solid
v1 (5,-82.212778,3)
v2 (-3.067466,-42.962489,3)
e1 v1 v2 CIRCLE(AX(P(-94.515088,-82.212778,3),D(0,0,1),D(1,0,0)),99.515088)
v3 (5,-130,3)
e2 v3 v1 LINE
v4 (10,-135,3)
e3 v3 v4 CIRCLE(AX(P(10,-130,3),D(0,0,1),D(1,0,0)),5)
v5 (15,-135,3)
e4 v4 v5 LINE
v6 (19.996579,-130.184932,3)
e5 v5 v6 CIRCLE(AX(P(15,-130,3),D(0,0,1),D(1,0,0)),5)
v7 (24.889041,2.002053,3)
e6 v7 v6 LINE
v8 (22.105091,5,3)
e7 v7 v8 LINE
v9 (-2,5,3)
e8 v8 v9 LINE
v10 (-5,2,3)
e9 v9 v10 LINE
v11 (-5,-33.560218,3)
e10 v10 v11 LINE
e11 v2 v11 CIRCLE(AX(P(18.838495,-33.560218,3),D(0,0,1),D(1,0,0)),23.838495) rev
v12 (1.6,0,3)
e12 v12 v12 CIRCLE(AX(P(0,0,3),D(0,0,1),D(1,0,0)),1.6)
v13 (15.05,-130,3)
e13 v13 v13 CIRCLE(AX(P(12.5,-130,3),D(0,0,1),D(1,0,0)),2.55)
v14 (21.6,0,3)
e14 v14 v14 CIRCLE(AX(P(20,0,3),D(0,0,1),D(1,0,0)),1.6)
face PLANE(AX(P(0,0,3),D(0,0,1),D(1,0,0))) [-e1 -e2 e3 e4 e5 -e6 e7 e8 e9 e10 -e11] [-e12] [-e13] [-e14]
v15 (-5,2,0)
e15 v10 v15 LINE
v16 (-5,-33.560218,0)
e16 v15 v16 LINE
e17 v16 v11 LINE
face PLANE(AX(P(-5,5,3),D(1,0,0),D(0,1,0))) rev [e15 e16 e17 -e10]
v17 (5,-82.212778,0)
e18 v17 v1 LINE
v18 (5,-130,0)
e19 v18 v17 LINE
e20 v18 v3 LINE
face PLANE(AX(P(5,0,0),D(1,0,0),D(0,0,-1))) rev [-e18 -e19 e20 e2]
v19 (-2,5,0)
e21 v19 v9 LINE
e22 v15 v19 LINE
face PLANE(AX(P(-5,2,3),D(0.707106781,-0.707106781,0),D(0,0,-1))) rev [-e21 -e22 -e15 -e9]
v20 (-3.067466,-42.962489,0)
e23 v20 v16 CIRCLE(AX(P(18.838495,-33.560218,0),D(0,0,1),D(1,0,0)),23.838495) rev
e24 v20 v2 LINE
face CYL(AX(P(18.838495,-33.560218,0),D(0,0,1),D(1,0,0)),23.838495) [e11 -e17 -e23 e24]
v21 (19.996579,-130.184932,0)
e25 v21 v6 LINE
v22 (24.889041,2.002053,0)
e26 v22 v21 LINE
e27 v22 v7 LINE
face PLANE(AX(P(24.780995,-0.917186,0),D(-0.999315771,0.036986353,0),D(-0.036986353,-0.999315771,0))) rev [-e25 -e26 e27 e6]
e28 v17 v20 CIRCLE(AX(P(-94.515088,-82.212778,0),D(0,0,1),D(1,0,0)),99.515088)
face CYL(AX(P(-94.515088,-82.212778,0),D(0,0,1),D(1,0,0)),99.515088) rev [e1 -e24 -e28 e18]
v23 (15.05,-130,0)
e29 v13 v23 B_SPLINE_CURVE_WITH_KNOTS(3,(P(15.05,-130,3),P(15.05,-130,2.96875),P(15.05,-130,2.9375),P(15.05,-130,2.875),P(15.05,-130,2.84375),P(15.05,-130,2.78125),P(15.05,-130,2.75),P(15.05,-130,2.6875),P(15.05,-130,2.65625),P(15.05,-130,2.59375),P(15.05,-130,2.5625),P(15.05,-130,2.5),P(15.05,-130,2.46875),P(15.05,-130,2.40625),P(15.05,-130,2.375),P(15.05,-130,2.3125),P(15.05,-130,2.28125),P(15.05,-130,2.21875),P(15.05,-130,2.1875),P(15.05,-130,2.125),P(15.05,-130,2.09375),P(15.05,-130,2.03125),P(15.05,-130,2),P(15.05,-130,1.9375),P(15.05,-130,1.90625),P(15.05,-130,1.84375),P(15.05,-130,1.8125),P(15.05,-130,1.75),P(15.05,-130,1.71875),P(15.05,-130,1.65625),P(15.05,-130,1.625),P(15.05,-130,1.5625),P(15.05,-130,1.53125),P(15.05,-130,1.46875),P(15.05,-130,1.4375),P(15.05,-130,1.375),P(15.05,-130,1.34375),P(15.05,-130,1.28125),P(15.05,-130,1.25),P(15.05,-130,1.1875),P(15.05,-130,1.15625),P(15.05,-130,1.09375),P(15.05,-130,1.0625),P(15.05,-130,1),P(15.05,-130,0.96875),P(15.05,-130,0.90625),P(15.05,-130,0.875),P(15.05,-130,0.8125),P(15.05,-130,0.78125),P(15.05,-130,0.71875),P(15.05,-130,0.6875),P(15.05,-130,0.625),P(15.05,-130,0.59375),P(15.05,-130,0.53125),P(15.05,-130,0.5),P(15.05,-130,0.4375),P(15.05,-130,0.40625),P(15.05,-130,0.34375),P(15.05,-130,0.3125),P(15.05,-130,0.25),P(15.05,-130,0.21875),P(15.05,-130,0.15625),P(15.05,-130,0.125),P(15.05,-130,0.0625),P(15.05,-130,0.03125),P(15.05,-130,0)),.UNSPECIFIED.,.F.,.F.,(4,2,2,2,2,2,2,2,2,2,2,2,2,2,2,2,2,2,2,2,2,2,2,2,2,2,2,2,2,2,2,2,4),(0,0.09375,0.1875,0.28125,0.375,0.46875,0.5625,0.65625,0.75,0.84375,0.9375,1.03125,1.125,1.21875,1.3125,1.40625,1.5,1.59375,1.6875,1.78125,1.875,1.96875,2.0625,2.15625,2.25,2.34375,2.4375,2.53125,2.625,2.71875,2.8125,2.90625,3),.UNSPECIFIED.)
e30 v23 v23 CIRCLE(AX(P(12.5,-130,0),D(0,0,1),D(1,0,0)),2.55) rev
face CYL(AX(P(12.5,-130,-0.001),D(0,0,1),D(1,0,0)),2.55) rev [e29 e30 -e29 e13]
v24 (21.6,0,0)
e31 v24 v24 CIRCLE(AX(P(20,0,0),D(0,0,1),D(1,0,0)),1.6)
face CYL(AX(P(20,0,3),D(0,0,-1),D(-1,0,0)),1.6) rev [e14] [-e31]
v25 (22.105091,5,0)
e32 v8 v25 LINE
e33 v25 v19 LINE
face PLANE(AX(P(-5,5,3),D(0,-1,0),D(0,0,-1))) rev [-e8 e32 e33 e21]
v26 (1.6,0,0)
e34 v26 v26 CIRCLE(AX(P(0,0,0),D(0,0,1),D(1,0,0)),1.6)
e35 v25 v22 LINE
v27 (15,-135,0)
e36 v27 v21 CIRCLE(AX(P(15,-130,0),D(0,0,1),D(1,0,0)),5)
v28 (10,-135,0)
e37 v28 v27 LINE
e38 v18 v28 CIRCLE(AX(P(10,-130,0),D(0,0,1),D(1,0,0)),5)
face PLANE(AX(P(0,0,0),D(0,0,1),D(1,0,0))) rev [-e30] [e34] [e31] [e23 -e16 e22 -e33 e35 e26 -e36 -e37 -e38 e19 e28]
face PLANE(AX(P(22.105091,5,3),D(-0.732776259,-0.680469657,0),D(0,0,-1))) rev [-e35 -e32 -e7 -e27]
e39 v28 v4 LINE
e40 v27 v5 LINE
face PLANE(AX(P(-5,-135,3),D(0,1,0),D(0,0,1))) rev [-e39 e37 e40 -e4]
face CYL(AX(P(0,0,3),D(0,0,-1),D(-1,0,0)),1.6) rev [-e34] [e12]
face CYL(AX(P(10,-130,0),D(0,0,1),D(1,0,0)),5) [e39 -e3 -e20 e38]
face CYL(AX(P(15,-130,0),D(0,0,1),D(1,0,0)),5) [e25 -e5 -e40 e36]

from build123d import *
from OCP.BRepFilletAPI import BRepFilletAPI_MakeChamfer

# Parameters (mm, degrees)
SKETCH_1_W          = 30
SKETCH_1_H          = 140
SKETCH_1_R          = 1.6
EXTRUDE_1_DEPTH     = 3
CUT_EXTRUDE_3_REACH = 139.328
SKETCH_4_W          = 5
SKETCH_4_H          = 55
CHAMFER_1_SIZE      = 2.5
CUT_EXTRUDE_4_REACH = 139.328
SKETCH_5_R          = 2.55
EXTRUDE_5_DEPTH     = 3
EXTRUDE_2_DEPTH     = 3
FILLET_2_R          = 65
FILLET_3_R          = 115
FILLET_4_R          = 5
CUT_EXTRUDE_START   = -3
CUT_EXTRUDE_6_DEPTH = 3
CHAMFER_2_SIZE      = 3
CHAMFER_2_SIZE2     = 2.894908666


# Read off the part's stored shape, not the designer's step: 切除-拉伸6
with BuildPart() as part:
    # 草图1 → 凸台-拉伸1 (new body)
    with BuildSketch(Plane.XY):
        with Locations((10, -65)):
            Rectangle(SKETCH_1_W, SKETCH_1_H)
        Circle(SKETCH_1_R, mode=Mode.SUBTRACT)
        with Locations((20, 0)):
            Circle(SKETCH_1_R, mode=Mode.SUBTRACT)
    extrude(amount=EXTRUDE_1_DEPTH)

    # 草图4 → 切除-拉伸3 (cut, up to next)
    with BuildSketch(Plane.XY.offset(3), mode=Mode.PRIVATE) as cut_extrude_3_sk1:
        with Locations((-2.5, -107.5)):
            Rectangle(SKETCH_4_W, SKETCH_4_H)
    cut_extrude_3_tool1 = extrude(cut_extrude_3_sk1.sketch, amount=-CUT_EXTRUDE_3_REACH, mode=Mode.PRIVATE) & part.part
    add(cut_extrude_3_tool1.solids().sort_by_distance((-2.5, -107.5, 3))[0], mode=Mode.SUBTRACT)

    # 倒角1
    chamfer_1_edges = [part.edges().sort_by_distance(p)[0] for p in [
        (-5, -80, 1.5),
    ]]
    chamfer(chamfer_1_edges, length=CHAMFER_1_SIZE)

    # 草图5 → 切除-拉伸4 (cut, up to next)
    with BuildSketch(Plane.XY.offset(3), mode=Mode.PRIVATE) as cut_extrude_4_sk1:
        with Locations((12.5, -130)):
            Circle(SKETCH_5_R)
    cut_extrude_4_tool1 = extrude(cut_extrude_4_sk1.sketch, amount=-CUT_EXTRUDE_4_REACH, mode=Mode.PRIVATE) & part.part
    add(cut_extrude_4_tool1.solids().sort_by_distance((12.5, -130, 3))[0], mode=Mode.SUBTRACT)

    # 草图9 → 凸台-拉伸5 (add)
    with BuildSketch(Plane(origin=(0, 0, 0), x_dir=(-1, 0, 0), z_dir=(0, 0, -1))):
        Polygon((5, -77.5), (0, -107.5), (0, -80), (2.5, -80), align=None)
    extrude(amount=-EXTRUDE_5_DEPTH)

    # 草图11 → 拉伸-薄壁2 (add)
    with BuildSketch(Plane.XY.offset(3)):
        Polygon((19.5, -67.916286439), (19.5, -61.710608008), (19.5, -3.420169007), (16.5, -3.420169007), (16.5, -61.710608008), (16.5, -67.916286439), align=None)
    extrude(amount=-EXTRUDE_2_DEPTH)

    # 圆角2
    fillet_2_edges = [part.edges().sort_by_distance(p)[0] for p in [
        (-5, -77.5, 1.5),
    ]]
    fillet(fillet_2_edges, radius=FILLET_2_R)

    # 圆角3
    fillet_3_edges = [part.edges().sort_by_distance(p)[0] for p in [
        (0, -107.5, 1.5),
    ]]
    fillet(fillet_3_edges, radius=FILLET_3_R)

    # 圆角4
    fillet_4_edges = [part.edges().sort_by_distance(p)[0] for p in [
        (0, -135, 1.5),
    ]]
    fillet(fillet_4_edges, radius=FILLET_4_R)

    # 切除-拉伸6 outline → 切除-拉伸6 (cut)
    with BuildSketch(Plane.XY.offset(3).offset(CUT_EXTRUDE_START)):
        with BuildLine():
            ThreePointArc((19.996578854, -130.184931767), (18.469534635, -133.600323516), (15, -135))
            Line((15, -135), (25, -135))
            Line((25, -135), (25, 5))
            Line((25, 5), (19.996578854, -130.184931767))
        make_face()
        with BuildLine():
            ThreePointArc((10, -135), (6.464466094, -133.535533906), (5, -130))
            Line((5, -130), (5, -82.212778368))
            ThreePointArc((5, -82.212778368), (2.962270532, -62.17737686), (-3.067466378, -42.962488681))
            ThreePointArc((-3.067466378, -42.962488681), (-4.511868965, -38.359628786), (-5, -33.560217765))
            Line((-5, -33.560217765), (-5, -72.120435531))
            ThreePointArc((-5, -72.120435531), (-4.778523942, -77.481670081), (-4.115605049, -82.806369705))
            Line((-4.115605049, -82.806369705), (-1.564698759, -98.111807444))
            ThreePointArc((-1.564698759, -98.111807444), (-0.391842257, -107.532429856), (0, -117.017690984))
            Line((0, -117.017690984), (0, -130))
            ThreePointArc((0, -130), (1.464466094, -133.535533906), (5, -135))
            Line((5, -135), (10, -135))
        make_face()
    extrude(amount=CUT_EXTRUDE_6_DEPTH, mode=Mode.SUBTRACT)

    # 倒角2: one chamfer whose edges measure the first distance from different faces: ONE call of the kernel's chamfer builder (chamfer() names one face for all edges)
    chamfer_2_edges_1 = [part.edges().sort_by_distance(p)[0] for p in [
        (-5, 5, 1.5),
    ]]
    chamfer_2_edges_2 = [part.edges().sort_by_distance(p)[0] for p in [
        (25, 5, 1.5),
    ]]
    chamfer_2_side_2 = [part.faces().sort_by_distance(p)[0] for p in [
        (22.498289427, -62.592465884, 1.5),
    ]]
    chamfer_2 = BRepFilletAPI_MakeChamfer(part.part.solid().wrapped)
    for e in chamfer_2_edges_1:
        chamfer_2.Add(CHAMFER_2_SIZE, e.wrapped)
    for e in chamfer_2_edges_2:
        chamfer_2.Add(CHAMFER_2_SIZE, CHAMFER_2_SIZE2, e.wrapped, chamfer_2_side_2[0].wrapped)  # the first distance lies on this face
    add(Compound.cast(chamfer_2.Shape()), mode=Mode.REPLACE)


solid = part.part
